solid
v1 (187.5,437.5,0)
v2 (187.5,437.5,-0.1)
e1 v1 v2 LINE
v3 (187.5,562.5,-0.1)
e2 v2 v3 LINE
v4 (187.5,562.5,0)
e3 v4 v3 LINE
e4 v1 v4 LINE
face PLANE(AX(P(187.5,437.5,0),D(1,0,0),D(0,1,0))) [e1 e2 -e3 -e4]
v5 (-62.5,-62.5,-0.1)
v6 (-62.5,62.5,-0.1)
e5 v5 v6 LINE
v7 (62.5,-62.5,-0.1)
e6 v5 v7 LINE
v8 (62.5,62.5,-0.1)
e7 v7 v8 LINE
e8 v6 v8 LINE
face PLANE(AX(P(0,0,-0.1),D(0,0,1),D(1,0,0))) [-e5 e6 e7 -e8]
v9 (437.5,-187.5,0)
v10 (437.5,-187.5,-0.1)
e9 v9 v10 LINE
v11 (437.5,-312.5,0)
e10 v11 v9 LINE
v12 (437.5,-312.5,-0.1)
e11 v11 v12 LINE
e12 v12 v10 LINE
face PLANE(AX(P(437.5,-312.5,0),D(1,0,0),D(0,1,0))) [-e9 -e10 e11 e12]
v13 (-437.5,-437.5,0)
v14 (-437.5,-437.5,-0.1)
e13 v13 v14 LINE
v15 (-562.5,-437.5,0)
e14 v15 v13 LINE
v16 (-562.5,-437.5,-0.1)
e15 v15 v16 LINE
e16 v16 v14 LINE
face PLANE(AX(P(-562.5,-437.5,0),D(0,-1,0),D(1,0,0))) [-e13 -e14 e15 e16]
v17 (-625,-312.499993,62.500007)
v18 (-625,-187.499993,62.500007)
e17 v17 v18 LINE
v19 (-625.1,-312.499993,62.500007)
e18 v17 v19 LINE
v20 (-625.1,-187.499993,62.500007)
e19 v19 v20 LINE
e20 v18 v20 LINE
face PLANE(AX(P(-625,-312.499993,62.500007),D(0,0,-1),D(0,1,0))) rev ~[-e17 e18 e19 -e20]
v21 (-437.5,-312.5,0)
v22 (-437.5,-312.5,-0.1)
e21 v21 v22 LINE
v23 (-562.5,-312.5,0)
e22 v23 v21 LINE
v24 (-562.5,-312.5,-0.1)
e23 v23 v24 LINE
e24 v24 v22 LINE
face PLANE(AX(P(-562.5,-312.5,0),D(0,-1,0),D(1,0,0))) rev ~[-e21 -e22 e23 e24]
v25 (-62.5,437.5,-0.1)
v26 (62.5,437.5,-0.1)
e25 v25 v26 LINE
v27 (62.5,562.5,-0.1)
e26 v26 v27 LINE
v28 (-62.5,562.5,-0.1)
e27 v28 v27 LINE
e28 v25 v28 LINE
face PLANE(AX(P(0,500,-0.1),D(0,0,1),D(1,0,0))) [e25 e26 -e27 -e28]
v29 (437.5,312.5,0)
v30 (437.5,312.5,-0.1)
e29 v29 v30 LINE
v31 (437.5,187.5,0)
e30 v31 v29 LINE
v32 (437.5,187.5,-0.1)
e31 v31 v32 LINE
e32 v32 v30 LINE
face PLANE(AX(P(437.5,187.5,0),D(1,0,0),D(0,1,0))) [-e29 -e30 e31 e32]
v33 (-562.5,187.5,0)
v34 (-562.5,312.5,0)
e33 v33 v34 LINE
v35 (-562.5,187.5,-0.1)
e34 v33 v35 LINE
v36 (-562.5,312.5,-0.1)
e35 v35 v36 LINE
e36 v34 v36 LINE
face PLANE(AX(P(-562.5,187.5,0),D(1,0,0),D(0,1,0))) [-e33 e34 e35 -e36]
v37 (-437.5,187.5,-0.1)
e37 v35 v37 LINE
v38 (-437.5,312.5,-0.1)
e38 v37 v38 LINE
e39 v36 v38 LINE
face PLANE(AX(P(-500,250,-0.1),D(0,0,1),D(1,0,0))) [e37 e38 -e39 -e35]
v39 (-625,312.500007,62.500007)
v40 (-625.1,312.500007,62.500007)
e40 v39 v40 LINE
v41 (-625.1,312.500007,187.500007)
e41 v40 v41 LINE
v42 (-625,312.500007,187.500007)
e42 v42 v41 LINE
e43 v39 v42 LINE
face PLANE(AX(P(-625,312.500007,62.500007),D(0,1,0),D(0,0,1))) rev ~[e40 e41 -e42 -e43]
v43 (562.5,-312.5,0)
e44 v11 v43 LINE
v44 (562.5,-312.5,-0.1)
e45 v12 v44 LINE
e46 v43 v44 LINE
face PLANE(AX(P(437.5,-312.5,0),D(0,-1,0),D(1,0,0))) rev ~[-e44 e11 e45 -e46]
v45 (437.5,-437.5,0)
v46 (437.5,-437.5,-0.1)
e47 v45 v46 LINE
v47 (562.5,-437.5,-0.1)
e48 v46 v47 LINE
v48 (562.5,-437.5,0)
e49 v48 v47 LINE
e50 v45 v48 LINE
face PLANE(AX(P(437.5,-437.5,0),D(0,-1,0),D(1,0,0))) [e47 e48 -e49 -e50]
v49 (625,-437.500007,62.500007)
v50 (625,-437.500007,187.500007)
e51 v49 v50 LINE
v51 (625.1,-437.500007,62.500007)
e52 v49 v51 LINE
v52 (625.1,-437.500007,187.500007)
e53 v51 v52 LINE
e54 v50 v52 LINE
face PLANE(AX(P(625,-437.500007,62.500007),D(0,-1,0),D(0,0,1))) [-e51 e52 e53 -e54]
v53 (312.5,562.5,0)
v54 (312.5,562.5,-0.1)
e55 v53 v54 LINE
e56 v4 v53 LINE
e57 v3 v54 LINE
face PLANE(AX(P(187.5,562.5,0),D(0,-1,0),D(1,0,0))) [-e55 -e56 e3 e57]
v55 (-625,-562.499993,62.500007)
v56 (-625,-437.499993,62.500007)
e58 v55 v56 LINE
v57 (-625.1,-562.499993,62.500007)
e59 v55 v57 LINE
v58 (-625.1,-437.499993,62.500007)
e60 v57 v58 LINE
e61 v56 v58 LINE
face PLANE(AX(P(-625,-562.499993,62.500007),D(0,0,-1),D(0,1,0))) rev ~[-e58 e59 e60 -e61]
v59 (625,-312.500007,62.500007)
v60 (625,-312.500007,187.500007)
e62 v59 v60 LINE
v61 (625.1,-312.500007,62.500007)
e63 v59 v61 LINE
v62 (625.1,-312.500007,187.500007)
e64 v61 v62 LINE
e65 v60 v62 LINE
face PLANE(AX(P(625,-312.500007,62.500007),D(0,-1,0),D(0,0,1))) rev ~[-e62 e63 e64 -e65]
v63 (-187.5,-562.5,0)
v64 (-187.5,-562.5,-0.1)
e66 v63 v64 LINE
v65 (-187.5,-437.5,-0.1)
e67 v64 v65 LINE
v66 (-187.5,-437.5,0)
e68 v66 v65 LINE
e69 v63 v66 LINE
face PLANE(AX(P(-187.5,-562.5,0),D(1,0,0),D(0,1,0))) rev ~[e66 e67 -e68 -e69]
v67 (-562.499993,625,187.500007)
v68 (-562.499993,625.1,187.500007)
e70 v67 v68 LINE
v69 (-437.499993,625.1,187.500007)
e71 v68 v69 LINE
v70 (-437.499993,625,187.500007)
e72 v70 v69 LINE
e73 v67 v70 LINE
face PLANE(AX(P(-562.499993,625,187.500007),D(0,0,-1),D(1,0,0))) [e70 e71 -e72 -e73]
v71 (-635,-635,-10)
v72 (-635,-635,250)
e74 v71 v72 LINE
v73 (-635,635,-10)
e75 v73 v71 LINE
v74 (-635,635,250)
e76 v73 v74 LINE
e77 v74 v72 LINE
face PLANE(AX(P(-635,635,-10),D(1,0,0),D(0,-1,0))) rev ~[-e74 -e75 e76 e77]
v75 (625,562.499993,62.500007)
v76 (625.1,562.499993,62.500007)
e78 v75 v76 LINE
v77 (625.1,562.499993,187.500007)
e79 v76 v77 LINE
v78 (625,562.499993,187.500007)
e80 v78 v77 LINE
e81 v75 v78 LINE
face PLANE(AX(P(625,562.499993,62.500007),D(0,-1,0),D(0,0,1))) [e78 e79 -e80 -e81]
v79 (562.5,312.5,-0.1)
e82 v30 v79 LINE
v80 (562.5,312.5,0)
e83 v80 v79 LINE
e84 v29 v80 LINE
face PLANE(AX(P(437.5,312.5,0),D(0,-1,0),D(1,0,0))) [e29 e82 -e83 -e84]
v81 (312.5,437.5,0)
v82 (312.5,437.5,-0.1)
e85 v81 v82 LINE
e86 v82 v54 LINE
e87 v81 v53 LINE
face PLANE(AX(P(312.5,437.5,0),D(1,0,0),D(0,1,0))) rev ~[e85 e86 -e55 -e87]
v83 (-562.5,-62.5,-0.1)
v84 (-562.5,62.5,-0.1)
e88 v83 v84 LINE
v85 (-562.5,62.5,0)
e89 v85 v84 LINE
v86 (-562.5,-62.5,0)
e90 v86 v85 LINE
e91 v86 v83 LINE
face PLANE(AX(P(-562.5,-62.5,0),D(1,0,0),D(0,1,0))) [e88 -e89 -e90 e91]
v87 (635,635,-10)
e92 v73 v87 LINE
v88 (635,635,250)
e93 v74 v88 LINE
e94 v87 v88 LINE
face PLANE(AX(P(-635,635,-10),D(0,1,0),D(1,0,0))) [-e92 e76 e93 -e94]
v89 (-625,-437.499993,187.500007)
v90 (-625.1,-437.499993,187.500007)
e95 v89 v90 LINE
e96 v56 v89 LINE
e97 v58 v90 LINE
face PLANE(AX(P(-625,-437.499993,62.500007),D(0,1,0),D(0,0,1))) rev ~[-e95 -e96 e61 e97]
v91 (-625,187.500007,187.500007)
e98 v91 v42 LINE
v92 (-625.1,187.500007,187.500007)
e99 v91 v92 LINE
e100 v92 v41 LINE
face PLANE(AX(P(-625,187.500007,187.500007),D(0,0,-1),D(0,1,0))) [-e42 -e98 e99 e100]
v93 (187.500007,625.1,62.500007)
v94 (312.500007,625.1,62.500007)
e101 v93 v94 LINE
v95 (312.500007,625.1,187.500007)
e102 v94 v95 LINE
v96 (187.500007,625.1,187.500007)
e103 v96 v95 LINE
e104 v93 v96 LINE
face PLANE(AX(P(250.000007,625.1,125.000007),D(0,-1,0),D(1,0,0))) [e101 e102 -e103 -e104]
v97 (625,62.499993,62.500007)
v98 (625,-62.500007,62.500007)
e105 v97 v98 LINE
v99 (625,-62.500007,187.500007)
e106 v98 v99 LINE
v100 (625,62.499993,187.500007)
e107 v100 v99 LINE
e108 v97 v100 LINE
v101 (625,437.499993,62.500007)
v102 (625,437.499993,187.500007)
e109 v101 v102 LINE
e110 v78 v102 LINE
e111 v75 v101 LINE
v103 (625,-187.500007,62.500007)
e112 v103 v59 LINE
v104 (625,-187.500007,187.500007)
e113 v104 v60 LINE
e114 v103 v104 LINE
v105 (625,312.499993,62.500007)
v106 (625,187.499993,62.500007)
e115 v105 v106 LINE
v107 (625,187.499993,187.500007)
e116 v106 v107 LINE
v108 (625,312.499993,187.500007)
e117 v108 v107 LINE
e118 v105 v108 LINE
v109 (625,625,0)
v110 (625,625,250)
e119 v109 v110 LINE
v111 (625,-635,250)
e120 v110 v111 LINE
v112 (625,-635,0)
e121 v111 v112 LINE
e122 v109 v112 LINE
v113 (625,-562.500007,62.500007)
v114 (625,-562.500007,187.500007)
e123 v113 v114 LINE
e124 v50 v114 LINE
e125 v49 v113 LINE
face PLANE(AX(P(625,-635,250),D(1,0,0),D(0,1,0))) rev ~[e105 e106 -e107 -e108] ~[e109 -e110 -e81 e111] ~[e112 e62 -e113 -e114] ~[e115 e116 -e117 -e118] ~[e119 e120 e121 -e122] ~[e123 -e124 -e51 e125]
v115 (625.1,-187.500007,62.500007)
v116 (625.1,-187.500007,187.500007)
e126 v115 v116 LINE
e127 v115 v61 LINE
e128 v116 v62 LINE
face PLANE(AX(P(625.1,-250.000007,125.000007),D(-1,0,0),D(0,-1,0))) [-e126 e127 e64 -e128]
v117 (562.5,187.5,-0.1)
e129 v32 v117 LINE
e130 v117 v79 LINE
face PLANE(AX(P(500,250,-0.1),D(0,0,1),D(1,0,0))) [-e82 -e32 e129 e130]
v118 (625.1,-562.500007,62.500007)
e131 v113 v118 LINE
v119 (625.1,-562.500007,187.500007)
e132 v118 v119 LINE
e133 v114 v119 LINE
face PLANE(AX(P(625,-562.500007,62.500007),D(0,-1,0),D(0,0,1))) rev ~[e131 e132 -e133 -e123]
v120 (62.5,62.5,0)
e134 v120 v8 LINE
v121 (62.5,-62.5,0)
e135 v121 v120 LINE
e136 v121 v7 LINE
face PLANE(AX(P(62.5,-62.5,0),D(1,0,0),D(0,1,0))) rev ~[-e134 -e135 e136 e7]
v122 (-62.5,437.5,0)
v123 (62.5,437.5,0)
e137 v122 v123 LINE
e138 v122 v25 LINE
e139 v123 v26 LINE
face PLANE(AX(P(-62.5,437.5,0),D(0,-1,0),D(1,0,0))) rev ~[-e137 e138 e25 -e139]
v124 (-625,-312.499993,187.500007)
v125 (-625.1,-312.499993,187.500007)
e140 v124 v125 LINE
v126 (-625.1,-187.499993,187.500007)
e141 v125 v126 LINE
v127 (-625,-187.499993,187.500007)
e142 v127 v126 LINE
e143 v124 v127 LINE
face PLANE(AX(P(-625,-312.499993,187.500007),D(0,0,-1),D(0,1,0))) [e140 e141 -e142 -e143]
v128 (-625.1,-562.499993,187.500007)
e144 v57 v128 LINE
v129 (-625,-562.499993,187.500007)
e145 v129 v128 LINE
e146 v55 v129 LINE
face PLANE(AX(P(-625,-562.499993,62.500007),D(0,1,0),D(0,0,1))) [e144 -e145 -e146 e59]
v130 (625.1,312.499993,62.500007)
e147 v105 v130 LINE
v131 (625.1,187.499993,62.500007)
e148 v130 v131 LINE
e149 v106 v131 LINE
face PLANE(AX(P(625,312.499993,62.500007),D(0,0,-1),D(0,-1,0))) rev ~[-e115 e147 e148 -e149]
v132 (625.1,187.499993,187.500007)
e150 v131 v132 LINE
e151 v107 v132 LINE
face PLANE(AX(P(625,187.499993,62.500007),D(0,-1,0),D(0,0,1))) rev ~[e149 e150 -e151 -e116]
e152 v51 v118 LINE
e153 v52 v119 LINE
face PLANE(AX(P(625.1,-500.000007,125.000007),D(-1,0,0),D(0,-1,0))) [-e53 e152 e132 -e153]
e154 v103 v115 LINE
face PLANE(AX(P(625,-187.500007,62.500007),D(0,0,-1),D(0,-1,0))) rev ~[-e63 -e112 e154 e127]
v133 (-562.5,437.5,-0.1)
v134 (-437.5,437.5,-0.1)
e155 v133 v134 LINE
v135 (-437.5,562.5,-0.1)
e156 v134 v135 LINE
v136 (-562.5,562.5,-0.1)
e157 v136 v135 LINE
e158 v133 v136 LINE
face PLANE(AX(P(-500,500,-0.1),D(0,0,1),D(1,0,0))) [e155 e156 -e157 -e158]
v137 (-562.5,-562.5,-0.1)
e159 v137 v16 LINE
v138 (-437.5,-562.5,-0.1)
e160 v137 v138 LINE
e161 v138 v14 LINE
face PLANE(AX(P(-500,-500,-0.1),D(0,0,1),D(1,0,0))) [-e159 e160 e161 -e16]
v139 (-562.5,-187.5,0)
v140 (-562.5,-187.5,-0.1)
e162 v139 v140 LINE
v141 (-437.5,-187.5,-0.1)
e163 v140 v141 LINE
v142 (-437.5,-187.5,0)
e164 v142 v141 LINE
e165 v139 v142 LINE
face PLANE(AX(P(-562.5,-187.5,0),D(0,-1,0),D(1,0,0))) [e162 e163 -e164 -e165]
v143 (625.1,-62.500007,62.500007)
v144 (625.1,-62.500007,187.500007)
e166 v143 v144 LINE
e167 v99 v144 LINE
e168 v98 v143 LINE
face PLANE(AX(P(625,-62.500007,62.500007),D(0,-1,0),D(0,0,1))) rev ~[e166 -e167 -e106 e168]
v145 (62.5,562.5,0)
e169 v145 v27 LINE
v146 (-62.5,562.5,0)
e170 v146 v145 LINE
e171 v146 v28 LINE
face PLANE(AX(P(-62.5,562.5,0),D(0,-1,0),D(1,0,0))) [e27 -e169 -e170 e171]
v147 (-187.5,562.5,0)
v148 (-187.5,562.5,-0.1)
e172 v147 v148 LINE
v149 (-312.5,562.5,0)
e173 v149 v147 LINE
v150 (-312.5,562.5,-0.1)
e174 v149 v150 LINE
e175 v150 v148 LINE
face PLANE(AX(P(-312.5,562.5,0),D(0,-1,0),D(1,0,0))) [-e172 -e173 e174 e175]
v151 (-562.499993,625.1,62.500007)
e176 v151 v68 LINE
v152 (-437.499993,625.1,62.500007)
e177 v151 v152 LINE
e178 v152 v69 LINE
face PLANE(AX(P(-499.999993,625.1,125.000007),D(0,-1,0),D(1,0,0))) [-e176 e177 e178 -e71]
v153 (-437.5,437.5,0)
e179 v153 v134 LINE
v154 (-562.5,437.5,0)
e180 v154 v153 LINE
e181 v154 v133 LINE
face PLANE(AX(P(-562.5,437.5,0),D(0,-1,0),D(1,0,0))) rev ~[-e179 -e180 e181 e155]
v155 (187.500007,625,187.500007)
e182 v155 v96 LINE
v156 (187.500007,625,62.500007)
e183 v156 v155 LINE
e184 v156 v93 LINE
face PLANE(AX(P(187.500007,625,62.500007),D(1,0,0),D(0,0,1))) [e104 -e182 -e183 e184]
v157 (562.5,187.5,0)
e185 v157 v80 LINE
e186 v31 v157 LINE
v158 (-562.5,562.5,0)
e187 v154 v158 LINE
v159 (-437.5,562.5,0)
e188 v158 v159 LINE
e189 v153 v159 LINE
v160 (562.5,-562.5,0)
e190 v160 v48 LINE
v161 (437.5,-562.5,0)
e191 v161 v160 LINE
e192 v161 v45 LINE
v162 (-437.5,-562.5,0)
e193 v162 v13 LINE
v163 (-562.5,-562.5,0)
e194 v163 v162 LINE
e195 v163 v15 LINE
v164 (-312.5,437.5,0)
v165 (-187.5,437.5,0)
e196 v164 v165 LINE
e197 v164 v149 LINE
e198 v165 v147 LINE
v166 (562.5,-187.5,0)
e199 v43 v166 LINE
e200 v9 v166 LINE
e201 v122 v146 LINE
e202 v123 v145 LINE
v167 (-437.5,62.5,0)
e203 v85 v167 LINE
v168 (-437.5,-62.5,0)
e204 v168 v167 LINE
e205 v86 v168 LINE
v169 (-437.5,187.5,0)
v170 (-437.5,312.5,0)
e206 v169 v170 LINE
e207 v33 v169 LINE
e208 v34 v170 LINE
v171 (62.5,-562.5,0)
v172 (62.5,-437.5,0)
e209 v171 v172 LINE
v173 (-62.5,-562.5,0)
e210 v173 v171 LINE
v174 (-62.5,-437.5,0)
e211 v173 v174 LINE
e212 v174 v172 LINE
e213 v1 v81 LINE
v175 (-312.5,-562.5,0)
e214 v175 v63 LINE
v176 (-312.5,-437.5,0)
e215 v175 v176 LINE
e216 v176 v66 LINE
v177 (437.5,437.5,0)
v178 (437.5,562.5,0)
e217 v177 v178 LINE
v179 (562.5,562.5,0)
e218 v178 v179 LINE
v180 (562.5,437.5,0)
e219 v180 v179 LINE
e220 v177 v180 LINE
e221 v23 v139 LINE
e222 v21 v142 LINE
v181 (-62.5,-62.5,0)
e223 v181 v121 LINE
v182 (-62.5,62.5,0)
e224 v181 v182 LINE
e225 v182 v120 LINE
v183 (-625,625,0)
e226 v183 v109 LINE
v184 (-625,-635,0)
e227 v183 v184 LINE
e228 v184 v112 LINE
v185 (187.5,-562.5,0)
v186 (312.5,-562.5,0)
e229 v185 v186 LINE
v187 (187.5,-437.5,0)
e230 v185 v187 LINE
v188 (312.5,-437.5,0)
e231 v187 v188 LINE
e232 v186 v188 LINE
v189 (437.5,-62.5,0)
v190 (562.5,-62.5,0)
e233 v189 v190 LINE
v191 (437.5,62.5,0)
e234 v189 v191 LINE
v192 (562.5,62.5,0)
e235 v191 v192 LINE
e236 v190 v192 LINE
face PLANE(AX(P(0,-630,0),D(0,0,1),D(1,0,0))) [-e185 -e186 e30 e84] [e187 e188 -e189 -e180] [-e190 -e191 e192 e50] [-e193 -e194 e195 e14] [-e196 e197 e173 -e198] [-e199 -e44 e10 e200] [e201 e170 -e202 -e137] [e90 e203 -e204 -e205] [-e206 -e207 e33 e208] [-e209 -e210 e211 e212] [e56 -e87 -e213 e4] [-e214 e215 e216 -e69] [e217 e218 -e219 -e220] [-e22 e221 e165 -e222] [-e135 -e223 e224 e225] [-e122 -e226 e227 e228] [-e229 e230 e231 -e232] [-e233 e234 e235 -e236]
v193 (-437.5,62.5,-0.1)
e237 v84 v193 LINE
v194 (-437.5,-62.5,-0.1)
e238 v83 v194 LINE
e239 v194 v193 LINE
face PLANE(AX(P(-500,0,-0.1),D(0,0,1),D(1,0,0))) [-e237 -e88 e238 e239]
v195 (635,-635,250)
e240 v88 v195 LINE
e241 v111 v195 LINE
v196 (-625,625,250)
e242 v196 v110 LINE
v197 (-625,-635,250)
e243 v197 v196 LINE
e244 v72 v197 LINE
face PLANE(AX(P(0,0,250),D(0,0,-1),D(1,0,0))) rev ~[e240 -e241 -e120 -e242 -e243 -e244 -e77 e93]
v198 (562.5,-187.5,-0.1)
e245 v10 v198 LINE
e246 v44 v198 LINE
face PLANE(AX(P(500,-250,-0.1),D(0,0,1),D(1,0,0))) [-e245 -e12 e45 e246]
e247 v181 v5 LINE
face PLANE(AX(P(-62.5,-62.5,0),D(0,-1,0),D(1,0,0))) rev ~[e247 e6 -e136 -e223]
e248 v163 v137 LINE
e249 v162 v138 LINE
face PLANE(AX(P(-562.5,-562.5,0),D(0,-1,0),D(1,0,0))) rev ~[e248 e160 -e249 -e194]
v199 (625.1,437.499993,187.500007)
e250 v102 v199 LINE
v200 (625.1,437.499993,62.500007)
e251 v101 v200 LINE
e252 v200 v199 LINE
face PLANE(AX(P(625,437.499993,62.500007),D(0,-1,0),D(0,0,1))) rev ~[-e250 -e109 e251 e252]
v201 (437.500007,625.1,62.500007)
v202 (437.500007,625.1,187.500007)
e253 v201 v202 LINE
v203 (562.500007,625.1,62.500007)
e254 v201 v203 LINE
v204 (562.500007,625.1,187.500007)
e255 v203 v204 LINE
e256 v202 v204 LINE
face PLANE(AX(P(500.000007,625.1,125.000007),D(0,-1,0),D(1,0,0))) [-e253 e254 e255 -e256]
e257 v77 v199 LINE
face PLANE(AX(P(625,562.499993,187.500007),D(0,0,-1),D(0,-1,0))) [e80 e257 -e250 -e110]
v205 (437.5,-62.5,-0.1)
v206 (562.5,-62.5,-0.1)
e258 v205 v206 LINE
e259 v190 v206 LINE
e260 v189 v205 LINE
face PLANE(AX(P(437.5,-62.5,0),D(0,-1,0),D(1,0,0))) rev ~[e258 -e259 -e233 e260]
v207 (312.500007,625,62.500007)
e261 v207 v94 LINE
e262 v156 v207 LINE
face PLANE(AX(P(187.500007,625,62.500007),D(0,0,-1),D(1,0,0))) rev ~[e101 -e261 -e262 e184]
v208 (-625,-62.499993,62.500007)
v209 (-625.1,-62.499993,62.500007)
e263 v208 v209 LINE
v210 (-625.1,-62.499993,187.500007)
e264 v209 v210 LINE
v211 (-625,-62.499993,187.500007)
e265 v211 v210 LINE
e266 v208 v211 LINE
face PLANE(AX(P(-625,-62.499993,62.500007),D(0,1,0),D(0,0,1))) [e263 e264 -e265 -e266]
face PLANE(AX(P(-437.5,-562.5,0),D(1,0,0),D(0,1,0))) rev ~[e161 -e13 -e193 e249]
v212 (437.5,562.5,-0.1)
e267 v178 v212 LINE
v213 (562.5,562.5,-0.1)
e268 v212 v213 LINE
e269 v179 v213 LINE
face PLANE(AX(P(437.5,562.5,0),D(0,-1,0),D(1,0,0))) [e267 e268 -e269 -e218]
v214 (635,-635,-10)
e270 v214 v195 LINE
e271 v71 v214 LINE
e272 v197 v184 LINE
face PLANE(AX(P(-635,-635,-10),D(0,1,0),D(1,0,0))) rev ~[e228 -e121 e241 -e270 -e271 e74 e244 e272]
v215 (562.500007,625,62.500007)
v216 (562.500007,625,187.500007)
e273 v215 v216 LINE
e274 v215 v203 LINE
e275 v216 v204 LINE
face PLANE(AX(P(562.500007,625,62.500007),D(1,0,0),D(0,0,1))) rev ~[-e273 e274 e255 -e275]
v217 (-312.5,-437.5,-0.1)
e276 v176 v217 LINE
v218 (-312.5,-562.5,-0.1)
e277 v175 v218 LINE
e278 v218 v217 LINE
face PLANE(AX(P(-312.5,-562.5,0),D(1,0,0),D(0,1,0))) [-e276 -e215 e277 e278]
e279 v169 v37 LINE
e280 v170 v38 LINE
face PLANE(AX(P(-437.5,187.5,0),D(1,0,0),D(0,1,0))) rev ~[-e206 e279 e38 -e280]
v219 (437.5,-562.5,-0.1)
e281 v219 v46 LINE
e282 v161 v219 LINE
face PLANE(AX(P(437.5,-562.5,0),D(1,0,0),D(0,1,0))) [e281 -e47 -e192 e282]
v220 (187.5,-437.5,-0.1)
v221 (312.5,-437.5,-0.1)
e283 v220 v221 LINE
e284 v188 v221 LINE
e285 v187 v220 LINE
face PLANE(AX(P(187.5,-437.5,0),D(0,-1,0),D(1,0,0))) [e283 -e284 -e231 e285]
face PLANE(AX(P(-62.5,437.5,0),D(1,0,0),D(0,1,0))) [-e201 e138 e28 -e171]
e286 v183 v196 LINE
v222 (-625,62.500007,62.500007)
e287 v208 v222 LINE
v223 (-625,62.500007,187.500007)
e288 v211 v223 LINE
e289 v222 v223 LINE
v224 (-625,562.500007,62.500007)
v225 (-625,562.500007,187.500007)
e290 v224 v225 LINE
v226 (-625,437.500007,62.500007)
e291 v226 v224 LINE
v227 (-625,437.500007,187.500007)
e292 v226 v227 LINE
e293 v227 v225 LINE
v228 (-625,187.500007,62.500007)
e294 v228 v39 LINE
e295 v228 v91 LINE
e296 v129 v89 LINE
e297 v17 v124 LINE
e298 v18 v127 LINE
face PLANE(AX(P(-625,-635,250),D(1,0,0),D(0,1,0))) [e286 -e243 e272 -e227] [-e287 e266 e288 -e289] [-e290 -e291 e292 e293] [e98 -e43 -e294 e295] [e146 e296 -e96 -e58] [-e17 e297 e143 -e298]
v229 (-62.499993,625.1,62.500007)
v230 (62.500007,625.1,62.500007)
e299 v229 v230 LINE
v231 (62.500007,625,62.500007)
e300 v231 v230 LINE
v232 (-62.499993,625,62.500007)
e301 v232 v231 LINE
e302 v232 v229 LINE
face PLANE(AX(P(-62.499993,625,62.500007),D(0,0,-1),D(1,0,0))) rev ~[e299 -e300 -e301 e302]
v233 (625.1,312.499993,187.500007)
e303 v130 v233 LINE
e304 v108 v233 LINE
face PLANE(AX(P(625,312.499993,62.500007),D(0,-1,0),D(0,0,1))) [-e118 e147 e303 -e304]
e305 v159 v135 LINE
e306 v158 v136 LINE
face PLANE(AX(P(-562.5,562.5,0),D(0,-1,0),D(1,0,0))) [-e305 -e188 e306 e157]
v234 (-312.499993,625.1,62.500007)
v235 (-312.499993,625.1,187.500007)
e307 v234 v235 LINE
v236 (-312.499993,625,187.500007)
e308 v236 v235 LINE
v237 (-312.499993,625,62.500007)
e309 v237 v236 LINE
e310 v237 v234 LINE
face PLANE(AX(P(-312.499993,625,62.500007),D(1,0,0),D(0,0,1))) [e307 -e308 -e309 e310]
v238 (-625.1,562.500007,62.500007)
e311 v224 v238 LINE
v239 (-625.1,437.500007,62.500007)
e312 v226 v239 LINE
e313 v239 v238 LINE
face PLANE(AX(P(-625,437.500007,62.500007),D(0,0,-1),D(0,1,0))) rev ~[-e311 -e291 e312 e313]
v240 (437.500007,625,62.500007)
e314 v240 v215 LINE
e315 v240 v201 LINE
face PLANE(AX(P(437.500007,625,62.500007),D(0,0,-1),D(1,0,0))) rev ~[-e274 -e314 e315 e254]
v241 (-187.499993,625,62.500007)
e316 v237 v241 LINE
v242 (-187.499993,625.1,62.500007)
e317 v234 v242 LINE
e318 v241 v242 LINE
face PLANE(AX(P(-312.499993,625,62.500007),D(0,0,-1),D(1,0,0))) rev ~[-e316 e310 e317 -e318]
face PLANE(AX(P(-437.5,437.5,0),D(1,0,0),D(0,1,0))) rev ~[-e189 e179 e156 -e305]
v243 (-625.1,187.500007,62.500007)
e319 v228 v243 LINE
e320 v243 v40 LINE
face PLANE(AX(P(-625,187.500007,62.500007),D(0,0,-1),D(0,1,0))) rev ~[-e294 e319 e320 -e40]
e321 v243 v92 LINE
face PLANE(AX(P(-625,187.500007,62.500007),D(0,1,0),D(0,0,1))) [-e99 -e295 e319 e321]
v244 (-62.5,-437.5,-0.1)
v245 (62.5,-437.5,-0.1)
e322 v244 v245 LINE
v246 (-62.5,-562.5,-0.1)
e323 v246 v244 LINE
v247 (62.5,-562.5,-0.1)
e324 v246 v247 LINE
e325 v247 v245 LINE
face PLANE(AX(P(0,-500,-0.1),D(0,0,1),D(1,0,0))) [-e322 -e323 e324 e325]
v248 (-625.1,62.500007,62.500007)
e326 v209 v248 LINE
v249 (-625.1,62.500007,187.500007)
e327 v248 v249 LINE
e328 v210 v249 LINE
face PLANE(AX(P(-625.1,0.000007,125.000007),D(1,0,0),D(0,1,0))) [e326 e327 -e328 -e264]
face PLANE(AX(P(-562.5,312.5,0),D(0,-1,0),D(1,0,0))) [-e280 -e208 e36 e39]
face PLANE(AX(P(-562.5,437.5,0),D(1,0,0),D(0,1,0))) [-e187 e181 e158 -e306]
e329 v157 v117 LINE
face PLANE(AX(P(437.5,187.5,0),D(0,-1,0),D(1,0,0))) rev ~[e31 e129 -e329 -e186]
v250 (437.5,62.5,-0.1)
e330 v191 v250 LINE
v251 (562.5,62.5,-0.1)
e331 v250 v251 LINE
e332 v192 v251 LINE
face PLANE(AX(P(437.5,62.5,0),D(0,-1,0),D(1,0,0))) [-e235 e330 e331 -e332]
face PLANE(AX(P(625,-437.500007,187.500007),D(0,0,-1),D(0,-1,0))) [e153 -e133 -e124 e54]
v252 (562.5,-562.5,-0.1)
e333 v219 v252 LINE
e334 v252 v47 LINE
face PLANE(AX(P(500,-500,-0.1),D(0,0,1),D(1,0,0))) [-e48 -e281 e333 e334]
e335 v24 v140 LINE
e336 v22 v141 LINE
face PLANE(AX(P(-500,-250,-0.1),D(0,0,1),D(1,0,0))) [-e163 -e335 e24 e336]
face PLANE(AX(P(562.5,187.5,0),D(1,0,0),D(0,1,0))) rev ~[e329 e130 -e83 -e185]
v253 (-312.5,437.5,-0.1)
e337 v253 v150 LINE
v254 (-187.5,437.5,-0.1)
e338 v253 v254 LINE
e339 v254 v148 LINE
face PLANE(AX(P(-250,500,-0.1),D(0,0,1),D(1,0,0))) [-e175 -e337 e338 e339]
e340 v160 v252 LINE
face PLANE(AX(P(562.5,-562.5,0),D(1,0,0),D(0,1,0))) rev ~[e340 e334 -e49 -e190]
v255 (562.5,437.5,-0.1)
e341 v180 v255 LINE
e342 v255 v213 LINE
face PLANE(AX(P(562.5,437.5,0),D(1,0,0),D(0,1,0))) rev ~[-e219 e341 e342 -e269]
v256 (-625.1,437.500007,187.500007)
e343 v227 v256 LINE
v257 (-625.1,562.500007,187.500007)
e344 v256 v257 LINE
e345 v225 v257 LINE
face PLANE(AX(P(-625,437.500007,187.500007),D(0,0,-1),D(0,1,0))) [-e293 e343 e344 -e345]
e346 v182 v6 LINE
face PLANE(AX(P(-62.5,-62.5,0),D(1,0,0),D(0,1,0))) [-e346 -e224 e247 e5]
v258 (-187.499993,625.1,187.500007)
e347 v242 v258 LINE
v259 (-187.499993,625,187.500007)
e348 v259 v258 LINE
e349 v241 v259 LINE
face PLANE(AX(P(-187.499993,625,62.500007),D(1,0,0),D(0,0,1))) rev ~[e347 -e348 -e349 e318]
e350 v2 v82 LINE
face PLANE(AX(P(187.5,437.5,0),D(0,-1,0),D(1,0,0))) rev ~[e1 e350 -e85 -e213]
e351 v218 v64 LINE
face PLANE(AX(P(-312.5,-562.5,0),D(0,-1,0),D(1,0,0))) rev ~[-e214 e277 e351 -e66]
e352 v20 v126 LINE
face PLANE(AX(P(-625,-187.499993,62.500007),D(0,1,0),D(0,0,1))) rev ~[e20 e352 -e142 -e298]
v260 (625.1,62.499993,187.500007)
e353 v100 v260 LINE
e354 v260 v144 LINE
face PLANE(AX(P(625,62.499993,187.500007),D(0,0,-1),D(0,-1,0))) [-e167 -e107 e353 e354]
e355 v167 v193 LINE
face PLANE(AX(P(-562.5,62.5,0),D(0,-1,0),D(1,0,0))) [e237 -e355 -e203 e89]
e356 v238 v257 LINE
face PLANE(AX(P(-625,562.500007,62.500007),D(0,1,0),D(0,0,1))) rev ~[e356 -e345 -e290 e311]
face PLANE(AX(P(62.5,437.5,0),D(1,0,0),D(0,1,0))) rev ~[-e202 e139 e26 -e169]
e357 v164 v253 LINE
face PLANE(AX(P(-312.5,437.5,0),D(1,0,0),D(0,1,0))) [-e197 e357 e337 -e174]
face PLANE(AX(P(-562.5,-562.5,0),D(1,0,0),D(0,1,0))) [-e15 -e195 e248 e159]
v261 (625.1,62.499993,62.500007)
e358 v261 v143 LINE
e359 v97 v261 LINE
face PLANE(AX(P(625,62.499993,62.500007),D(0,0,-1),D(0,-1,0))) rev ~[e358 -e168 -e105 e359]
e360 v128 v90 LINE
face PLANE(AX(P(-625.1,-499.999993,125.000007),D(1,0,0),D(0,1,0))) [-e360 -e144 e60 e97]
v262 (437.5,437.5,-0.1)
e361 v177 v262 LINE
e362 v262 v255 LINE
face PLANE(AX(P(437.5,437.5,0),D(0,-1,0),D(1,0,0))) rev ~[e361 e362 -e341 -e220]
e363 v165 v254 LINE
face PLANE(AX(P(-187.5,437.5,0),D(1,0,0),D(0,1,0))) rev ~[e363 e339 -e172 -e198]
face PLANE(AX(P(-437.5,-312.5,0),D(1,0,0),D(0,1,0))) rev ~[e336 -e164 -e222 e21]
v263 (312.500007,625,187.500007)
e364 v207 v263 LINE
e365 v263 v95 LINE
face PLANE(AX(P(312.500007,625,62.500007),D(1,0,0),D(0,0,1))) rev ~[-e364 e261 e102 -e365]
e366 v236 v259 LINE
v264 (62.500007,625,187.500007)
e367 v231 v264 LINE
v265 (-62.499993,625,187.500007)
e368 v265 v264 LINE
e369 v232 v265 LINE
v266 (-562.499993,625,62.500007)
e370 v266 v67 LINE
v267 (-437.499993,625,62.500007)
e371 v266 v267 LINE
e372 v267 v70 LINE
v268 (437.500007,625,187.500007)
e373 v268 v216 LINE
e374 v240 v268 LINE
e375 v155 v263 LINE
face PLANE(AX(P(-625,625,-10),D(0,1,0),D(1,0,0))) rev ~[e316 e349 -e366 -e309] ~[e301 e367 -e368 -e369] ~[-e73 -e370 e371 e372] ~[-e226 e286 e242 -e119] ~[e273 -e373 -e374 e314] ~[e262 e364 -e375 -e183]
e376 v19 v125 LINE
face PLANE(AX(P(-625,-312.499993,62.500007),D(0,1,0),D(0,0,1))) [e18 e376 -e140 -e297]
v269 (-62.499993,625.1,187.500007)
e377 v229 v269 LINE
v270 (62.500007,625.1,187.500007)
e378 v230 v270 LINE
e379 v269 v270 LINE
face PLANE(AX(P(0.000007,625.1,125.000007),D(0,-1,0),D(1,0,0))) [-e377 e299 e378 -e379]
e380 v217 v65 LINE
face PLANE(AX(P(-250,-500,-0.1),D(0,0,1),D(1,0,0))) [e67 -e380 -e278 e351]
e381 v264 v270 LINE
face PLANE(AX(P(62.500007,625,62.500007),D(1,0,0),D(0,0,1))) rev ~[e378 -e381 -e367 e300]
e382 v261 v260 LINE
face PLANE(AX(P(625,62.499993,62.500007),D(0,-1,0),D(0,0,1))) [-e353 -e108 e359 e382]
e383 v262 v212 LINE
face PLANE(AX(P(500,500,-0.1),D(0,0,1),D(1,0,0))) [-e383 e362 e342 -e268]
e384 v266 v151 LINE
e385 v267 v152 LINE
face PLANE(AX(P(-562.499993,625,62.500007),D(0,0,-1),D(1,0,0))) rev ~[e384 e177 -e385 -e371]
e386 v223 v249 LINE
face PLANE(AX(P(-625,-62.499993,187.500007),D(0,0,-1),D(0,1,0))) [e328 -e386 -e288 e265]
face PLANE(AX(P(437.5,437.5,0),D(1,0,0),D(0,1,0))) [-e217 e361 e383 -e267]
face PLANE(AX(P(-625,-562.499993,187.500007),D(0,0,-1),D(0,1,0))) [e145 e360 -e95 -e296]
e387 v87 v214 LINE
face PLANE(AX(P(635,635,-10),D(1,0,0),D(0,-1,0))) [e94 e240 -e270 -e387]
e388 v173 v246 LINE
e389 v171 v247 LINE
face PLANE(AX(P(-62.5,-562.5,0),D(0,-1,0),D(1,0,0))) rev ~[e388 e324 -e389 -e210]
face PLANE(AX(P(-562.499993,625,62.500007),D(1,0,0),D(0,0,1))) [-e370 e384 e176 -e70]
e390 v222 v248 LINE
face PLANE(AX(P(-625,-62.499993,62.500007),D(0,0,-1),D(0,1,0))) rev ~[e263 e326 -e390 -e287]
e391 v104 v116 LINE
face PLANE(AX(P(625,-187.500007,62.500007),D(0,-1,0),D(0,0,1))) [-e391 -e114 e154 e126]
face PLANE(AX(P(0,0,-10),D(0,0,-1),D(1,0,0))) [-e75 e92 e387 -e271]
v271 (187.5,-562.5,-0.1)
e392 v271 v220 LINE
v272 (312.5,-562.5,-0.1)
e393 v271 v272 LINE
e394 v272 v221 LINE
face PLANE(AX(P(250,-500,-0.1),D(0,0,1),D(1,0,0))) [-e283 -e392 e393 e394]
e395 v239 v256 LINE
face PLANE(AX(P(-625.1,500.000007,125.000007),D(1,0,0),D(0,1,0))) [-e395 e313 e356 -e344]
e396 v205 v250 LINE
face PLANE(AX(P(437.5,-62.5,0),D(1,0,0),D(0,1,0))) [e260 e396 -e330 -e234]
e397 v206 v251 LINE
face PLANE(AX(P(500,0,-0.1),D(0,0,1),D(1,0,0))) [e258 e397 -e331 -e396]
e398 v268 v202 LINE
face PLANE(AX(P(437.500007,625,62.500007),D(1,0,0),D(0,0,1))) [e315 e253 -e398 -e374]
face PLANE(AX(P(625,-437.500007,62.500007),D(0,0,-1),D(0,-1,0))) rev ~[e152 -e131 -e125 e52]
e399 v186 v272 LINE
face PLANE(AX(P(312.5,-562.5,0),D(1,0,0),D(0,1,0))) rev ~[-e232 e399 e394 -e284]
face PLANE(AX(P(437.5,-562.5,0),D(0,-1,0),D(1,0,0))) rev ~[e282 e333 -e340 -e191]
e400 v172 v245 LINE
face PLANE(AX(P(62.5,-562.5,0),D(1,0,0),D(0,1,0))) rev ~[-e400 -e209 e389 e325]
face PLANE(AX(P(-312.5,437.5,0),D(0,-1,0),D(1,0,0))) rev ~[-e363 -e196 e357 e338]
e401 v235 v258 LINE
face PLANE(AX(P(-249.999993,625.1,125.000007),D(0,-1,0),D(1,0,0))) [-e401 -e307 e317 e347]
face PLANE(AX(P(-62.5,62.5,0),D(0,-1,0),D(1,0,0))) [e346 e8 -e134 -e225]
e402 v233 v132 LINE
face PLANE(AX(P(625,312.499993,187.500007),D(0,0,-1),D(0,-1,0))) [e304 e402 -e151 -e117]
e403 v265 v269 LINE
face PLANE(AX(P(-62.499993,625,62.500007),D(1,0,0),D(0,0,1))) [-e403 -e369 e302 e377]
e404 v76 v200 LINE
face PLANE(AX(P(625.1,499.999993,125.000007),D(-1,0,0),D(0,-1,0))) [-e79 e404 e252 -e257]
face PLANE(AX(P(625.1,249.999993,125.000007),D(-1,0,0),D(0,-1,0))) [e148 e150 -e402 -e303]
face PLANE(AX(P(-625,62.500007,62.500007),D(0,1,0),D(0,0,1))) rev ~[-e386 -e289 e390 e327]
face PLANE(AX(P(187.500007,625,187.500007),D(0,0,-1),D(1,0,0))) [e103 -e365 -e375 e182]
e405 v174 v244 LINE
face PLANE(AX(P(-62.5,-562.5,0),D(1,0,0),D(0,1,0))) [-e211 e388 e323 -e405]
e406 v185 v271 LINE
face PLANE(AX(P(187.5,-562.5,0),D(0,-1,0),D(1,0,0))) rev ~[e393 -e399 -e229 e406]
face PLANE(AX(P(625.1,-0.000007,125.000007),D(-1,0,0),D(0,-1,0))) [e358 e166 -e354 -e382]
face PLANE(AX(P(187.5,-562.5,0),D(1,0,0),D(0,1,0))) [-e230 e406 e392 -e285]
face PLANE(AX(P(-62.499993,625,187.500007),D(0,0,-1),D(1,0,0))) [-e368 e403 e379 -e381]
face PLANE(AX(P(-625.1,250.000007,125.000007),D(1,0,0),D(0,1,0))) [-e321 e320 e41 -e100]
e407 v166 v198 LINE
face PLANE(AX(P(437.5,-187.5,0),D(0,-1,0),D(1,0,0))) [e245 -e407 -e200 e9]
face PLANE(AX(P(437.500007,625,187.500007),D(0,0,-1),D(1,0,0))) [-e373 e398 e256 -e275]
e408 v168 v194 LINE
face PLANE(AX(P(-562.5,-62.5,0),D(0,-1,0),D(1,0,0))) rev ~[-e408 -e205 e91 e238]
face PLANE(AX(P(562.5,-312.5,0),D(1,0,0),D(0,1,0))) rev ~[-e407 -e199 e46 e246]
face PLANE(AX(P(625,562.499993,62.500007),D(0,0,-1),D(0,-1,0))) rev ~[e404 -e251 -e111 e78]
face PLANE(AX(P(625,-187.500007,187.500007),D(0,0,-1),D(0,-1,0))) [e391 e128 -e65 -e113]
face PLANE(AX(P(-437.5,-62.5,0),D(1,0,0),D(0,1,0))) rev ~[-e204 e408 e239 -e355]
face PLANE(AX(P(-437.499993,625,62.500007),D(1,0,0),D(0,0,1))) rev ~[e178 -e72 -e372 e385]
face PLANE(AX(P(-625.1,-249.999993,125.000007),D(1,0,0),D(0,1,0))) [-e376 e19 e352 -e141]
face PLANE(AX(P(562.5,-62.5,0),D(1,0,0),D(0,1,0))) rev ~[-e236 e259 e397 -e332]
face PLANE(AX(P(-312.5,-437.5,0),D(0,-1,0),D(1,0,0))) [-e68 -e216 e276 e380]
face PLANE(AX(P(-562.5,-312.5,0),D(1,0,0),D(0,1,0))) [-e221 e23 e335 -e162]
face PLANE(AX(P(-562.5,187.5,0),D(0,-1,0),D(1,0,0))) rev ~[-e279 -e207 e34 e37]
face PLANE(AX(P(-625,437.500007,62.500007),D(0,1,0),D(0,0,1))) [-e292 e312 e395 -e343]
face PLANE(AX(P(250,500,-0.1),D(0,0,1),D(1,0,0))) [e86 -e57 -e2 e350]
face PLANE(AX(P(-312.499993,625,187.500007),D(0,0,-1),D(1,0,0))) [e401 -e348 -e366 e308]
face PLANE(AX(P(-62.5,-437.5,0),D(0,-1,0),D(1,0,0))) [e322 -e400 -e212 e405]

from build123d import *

# Parameters (mm, degrees)
F1_W            = 1250
F1_H            = 1250
F2_DEPTH        = 10
F0_W            = 125
F0_H            = 125
F3_DEPTH        = 0.1
F4_W            = 1270
F4_H            = 1270
F4_W_2          = 1250
F4_H_2          = 1250
F5_DEPTH        = 260
F6_W            = 125
F6_H            = 125
F7_DEPTH        = 0.1
F7_COPIES_COUNT = 3
F7_COPIES_ANGLE = 180
F9_W            = 1250
F9_H            = 10
F10_DEPTH       = 250


# Not quite as in the source:
# - a pattern or mirror of a feature is missing from the dataset's text; its kind, count and spacing are read off the source's solid


with BuildPart() as f2:
    # F1 (on Top) → F2 (new body)
    with BuildSketch(Plane.XY):
        Rectangle(F1_W, F1_H)
    extrude(amount=-F2_DEPTH)

    # F0 (on Top) → F3 (cut)
    with BuildSketch(Plane.XY):
        with Locations((-500, 500)):
            Rectangle(F0_W, F0_H)
        with Locations((-250, 500)):
            Rectangle(F0_W, F0_H)
        with Locations((0, 500)):
            Rectangle(F0_W, F0_H)
        with Locations((250, 500)):
            Rectangle(F0_W, F0_H)
        with Locations((500, 500)):
            Rectangle(F0_W, F0_H)
        with Locations((-500, 250)):
            Rectangle(F0_W, F0_H)
        with Locations((-500, 0)):
            Rectangle(F0_W, F0_H)
        with Locations((-500, -250)):
            Rectangle(F0_W, F0_H)
        with Locations((-500, -500)):
            Rectangle(F0_W, F0_H)
        with Locations((250, -500)):
            Rectangle(F0_W, F0_H)
        with Locations((500, -500)):
            Rectangle(F0_W, F0_H)
        with Locations((500, 250)):
            Rectangle(F0_W, F0_H)
        with Locations((-250, -500)):
            Rectangle(F0_W, F0_H)
        with Locations((500, 0)):
            Rectangle(F0_W, F0_H)
        with Locations((0, -500)):
            Rectangle(F0_W, F0_H)
        with Locations((500, -250)):
            Rectangle(F0_W, F0_H)
        Rectangle(F0_W, F0_H)
    extrude(amount=-F3_DEPTH, mode=Mode.SUBTRACT)

    # F4 (on face) → F5 (join)
    with BuildSketch(Plane(origin=(0, 0, -10), x_dir=(1, 0, 0), z_dir=(0, 0, -1))):
        Rectangle(F4_W, F4_H)
        Rectangle(F4_W_2, F4_H_2, mode=Mode.SUBTRACT)
    extrude(amount=-F5_DEPTH)

    # F6 (on face) → F7 (cut)
    with BuildSketch(Plane.YZ.offset(-625)):
        with Locations((-499.9999926, 125.0000074)):
            Rectangle(F6_W, F6_H)
        with Locations((-249.9999926, 125.0000074)):
            Rectangle(F6_W, F6_H)
        with Locations((7.4e-06, 125.0000074)):
            Rectangle(F6_W, F6_H)
        with Locations((250.0000074, 125.0000074)):
            Rectangle(F6_W, F6_H)
        with Locations((500.0000074, 125.0000074)):
            Rectangle(F6_W, F6_H)
    f7 = extrude(amount=-F7_DEPTH, mode=Mode.SUBTRACT)

    # F7_copies: F7 ×3 about axis
    f7_copies_axis = Axis((0, 0, 0), (0, 0, -1))
    for i in range(1, F7_COPIES_COUNT):
        add(f7.rotate(f7_copies_axis, i * F7_COPIES_ANGLE / (F7_COPIES_COUNT - 1)), mode=Mode.SUBTRACT)

    # F9 (on face) → F10 (cut, through all)
    with BuildSketch(Plane.XY.offset(250)):
        with Locations((0, -630)):
            Rectangle(F9_W, F9_H)
    extrude(amount=-F10_DEPTH, mode=Mode.SUBTRACT)


solid = f2.part
